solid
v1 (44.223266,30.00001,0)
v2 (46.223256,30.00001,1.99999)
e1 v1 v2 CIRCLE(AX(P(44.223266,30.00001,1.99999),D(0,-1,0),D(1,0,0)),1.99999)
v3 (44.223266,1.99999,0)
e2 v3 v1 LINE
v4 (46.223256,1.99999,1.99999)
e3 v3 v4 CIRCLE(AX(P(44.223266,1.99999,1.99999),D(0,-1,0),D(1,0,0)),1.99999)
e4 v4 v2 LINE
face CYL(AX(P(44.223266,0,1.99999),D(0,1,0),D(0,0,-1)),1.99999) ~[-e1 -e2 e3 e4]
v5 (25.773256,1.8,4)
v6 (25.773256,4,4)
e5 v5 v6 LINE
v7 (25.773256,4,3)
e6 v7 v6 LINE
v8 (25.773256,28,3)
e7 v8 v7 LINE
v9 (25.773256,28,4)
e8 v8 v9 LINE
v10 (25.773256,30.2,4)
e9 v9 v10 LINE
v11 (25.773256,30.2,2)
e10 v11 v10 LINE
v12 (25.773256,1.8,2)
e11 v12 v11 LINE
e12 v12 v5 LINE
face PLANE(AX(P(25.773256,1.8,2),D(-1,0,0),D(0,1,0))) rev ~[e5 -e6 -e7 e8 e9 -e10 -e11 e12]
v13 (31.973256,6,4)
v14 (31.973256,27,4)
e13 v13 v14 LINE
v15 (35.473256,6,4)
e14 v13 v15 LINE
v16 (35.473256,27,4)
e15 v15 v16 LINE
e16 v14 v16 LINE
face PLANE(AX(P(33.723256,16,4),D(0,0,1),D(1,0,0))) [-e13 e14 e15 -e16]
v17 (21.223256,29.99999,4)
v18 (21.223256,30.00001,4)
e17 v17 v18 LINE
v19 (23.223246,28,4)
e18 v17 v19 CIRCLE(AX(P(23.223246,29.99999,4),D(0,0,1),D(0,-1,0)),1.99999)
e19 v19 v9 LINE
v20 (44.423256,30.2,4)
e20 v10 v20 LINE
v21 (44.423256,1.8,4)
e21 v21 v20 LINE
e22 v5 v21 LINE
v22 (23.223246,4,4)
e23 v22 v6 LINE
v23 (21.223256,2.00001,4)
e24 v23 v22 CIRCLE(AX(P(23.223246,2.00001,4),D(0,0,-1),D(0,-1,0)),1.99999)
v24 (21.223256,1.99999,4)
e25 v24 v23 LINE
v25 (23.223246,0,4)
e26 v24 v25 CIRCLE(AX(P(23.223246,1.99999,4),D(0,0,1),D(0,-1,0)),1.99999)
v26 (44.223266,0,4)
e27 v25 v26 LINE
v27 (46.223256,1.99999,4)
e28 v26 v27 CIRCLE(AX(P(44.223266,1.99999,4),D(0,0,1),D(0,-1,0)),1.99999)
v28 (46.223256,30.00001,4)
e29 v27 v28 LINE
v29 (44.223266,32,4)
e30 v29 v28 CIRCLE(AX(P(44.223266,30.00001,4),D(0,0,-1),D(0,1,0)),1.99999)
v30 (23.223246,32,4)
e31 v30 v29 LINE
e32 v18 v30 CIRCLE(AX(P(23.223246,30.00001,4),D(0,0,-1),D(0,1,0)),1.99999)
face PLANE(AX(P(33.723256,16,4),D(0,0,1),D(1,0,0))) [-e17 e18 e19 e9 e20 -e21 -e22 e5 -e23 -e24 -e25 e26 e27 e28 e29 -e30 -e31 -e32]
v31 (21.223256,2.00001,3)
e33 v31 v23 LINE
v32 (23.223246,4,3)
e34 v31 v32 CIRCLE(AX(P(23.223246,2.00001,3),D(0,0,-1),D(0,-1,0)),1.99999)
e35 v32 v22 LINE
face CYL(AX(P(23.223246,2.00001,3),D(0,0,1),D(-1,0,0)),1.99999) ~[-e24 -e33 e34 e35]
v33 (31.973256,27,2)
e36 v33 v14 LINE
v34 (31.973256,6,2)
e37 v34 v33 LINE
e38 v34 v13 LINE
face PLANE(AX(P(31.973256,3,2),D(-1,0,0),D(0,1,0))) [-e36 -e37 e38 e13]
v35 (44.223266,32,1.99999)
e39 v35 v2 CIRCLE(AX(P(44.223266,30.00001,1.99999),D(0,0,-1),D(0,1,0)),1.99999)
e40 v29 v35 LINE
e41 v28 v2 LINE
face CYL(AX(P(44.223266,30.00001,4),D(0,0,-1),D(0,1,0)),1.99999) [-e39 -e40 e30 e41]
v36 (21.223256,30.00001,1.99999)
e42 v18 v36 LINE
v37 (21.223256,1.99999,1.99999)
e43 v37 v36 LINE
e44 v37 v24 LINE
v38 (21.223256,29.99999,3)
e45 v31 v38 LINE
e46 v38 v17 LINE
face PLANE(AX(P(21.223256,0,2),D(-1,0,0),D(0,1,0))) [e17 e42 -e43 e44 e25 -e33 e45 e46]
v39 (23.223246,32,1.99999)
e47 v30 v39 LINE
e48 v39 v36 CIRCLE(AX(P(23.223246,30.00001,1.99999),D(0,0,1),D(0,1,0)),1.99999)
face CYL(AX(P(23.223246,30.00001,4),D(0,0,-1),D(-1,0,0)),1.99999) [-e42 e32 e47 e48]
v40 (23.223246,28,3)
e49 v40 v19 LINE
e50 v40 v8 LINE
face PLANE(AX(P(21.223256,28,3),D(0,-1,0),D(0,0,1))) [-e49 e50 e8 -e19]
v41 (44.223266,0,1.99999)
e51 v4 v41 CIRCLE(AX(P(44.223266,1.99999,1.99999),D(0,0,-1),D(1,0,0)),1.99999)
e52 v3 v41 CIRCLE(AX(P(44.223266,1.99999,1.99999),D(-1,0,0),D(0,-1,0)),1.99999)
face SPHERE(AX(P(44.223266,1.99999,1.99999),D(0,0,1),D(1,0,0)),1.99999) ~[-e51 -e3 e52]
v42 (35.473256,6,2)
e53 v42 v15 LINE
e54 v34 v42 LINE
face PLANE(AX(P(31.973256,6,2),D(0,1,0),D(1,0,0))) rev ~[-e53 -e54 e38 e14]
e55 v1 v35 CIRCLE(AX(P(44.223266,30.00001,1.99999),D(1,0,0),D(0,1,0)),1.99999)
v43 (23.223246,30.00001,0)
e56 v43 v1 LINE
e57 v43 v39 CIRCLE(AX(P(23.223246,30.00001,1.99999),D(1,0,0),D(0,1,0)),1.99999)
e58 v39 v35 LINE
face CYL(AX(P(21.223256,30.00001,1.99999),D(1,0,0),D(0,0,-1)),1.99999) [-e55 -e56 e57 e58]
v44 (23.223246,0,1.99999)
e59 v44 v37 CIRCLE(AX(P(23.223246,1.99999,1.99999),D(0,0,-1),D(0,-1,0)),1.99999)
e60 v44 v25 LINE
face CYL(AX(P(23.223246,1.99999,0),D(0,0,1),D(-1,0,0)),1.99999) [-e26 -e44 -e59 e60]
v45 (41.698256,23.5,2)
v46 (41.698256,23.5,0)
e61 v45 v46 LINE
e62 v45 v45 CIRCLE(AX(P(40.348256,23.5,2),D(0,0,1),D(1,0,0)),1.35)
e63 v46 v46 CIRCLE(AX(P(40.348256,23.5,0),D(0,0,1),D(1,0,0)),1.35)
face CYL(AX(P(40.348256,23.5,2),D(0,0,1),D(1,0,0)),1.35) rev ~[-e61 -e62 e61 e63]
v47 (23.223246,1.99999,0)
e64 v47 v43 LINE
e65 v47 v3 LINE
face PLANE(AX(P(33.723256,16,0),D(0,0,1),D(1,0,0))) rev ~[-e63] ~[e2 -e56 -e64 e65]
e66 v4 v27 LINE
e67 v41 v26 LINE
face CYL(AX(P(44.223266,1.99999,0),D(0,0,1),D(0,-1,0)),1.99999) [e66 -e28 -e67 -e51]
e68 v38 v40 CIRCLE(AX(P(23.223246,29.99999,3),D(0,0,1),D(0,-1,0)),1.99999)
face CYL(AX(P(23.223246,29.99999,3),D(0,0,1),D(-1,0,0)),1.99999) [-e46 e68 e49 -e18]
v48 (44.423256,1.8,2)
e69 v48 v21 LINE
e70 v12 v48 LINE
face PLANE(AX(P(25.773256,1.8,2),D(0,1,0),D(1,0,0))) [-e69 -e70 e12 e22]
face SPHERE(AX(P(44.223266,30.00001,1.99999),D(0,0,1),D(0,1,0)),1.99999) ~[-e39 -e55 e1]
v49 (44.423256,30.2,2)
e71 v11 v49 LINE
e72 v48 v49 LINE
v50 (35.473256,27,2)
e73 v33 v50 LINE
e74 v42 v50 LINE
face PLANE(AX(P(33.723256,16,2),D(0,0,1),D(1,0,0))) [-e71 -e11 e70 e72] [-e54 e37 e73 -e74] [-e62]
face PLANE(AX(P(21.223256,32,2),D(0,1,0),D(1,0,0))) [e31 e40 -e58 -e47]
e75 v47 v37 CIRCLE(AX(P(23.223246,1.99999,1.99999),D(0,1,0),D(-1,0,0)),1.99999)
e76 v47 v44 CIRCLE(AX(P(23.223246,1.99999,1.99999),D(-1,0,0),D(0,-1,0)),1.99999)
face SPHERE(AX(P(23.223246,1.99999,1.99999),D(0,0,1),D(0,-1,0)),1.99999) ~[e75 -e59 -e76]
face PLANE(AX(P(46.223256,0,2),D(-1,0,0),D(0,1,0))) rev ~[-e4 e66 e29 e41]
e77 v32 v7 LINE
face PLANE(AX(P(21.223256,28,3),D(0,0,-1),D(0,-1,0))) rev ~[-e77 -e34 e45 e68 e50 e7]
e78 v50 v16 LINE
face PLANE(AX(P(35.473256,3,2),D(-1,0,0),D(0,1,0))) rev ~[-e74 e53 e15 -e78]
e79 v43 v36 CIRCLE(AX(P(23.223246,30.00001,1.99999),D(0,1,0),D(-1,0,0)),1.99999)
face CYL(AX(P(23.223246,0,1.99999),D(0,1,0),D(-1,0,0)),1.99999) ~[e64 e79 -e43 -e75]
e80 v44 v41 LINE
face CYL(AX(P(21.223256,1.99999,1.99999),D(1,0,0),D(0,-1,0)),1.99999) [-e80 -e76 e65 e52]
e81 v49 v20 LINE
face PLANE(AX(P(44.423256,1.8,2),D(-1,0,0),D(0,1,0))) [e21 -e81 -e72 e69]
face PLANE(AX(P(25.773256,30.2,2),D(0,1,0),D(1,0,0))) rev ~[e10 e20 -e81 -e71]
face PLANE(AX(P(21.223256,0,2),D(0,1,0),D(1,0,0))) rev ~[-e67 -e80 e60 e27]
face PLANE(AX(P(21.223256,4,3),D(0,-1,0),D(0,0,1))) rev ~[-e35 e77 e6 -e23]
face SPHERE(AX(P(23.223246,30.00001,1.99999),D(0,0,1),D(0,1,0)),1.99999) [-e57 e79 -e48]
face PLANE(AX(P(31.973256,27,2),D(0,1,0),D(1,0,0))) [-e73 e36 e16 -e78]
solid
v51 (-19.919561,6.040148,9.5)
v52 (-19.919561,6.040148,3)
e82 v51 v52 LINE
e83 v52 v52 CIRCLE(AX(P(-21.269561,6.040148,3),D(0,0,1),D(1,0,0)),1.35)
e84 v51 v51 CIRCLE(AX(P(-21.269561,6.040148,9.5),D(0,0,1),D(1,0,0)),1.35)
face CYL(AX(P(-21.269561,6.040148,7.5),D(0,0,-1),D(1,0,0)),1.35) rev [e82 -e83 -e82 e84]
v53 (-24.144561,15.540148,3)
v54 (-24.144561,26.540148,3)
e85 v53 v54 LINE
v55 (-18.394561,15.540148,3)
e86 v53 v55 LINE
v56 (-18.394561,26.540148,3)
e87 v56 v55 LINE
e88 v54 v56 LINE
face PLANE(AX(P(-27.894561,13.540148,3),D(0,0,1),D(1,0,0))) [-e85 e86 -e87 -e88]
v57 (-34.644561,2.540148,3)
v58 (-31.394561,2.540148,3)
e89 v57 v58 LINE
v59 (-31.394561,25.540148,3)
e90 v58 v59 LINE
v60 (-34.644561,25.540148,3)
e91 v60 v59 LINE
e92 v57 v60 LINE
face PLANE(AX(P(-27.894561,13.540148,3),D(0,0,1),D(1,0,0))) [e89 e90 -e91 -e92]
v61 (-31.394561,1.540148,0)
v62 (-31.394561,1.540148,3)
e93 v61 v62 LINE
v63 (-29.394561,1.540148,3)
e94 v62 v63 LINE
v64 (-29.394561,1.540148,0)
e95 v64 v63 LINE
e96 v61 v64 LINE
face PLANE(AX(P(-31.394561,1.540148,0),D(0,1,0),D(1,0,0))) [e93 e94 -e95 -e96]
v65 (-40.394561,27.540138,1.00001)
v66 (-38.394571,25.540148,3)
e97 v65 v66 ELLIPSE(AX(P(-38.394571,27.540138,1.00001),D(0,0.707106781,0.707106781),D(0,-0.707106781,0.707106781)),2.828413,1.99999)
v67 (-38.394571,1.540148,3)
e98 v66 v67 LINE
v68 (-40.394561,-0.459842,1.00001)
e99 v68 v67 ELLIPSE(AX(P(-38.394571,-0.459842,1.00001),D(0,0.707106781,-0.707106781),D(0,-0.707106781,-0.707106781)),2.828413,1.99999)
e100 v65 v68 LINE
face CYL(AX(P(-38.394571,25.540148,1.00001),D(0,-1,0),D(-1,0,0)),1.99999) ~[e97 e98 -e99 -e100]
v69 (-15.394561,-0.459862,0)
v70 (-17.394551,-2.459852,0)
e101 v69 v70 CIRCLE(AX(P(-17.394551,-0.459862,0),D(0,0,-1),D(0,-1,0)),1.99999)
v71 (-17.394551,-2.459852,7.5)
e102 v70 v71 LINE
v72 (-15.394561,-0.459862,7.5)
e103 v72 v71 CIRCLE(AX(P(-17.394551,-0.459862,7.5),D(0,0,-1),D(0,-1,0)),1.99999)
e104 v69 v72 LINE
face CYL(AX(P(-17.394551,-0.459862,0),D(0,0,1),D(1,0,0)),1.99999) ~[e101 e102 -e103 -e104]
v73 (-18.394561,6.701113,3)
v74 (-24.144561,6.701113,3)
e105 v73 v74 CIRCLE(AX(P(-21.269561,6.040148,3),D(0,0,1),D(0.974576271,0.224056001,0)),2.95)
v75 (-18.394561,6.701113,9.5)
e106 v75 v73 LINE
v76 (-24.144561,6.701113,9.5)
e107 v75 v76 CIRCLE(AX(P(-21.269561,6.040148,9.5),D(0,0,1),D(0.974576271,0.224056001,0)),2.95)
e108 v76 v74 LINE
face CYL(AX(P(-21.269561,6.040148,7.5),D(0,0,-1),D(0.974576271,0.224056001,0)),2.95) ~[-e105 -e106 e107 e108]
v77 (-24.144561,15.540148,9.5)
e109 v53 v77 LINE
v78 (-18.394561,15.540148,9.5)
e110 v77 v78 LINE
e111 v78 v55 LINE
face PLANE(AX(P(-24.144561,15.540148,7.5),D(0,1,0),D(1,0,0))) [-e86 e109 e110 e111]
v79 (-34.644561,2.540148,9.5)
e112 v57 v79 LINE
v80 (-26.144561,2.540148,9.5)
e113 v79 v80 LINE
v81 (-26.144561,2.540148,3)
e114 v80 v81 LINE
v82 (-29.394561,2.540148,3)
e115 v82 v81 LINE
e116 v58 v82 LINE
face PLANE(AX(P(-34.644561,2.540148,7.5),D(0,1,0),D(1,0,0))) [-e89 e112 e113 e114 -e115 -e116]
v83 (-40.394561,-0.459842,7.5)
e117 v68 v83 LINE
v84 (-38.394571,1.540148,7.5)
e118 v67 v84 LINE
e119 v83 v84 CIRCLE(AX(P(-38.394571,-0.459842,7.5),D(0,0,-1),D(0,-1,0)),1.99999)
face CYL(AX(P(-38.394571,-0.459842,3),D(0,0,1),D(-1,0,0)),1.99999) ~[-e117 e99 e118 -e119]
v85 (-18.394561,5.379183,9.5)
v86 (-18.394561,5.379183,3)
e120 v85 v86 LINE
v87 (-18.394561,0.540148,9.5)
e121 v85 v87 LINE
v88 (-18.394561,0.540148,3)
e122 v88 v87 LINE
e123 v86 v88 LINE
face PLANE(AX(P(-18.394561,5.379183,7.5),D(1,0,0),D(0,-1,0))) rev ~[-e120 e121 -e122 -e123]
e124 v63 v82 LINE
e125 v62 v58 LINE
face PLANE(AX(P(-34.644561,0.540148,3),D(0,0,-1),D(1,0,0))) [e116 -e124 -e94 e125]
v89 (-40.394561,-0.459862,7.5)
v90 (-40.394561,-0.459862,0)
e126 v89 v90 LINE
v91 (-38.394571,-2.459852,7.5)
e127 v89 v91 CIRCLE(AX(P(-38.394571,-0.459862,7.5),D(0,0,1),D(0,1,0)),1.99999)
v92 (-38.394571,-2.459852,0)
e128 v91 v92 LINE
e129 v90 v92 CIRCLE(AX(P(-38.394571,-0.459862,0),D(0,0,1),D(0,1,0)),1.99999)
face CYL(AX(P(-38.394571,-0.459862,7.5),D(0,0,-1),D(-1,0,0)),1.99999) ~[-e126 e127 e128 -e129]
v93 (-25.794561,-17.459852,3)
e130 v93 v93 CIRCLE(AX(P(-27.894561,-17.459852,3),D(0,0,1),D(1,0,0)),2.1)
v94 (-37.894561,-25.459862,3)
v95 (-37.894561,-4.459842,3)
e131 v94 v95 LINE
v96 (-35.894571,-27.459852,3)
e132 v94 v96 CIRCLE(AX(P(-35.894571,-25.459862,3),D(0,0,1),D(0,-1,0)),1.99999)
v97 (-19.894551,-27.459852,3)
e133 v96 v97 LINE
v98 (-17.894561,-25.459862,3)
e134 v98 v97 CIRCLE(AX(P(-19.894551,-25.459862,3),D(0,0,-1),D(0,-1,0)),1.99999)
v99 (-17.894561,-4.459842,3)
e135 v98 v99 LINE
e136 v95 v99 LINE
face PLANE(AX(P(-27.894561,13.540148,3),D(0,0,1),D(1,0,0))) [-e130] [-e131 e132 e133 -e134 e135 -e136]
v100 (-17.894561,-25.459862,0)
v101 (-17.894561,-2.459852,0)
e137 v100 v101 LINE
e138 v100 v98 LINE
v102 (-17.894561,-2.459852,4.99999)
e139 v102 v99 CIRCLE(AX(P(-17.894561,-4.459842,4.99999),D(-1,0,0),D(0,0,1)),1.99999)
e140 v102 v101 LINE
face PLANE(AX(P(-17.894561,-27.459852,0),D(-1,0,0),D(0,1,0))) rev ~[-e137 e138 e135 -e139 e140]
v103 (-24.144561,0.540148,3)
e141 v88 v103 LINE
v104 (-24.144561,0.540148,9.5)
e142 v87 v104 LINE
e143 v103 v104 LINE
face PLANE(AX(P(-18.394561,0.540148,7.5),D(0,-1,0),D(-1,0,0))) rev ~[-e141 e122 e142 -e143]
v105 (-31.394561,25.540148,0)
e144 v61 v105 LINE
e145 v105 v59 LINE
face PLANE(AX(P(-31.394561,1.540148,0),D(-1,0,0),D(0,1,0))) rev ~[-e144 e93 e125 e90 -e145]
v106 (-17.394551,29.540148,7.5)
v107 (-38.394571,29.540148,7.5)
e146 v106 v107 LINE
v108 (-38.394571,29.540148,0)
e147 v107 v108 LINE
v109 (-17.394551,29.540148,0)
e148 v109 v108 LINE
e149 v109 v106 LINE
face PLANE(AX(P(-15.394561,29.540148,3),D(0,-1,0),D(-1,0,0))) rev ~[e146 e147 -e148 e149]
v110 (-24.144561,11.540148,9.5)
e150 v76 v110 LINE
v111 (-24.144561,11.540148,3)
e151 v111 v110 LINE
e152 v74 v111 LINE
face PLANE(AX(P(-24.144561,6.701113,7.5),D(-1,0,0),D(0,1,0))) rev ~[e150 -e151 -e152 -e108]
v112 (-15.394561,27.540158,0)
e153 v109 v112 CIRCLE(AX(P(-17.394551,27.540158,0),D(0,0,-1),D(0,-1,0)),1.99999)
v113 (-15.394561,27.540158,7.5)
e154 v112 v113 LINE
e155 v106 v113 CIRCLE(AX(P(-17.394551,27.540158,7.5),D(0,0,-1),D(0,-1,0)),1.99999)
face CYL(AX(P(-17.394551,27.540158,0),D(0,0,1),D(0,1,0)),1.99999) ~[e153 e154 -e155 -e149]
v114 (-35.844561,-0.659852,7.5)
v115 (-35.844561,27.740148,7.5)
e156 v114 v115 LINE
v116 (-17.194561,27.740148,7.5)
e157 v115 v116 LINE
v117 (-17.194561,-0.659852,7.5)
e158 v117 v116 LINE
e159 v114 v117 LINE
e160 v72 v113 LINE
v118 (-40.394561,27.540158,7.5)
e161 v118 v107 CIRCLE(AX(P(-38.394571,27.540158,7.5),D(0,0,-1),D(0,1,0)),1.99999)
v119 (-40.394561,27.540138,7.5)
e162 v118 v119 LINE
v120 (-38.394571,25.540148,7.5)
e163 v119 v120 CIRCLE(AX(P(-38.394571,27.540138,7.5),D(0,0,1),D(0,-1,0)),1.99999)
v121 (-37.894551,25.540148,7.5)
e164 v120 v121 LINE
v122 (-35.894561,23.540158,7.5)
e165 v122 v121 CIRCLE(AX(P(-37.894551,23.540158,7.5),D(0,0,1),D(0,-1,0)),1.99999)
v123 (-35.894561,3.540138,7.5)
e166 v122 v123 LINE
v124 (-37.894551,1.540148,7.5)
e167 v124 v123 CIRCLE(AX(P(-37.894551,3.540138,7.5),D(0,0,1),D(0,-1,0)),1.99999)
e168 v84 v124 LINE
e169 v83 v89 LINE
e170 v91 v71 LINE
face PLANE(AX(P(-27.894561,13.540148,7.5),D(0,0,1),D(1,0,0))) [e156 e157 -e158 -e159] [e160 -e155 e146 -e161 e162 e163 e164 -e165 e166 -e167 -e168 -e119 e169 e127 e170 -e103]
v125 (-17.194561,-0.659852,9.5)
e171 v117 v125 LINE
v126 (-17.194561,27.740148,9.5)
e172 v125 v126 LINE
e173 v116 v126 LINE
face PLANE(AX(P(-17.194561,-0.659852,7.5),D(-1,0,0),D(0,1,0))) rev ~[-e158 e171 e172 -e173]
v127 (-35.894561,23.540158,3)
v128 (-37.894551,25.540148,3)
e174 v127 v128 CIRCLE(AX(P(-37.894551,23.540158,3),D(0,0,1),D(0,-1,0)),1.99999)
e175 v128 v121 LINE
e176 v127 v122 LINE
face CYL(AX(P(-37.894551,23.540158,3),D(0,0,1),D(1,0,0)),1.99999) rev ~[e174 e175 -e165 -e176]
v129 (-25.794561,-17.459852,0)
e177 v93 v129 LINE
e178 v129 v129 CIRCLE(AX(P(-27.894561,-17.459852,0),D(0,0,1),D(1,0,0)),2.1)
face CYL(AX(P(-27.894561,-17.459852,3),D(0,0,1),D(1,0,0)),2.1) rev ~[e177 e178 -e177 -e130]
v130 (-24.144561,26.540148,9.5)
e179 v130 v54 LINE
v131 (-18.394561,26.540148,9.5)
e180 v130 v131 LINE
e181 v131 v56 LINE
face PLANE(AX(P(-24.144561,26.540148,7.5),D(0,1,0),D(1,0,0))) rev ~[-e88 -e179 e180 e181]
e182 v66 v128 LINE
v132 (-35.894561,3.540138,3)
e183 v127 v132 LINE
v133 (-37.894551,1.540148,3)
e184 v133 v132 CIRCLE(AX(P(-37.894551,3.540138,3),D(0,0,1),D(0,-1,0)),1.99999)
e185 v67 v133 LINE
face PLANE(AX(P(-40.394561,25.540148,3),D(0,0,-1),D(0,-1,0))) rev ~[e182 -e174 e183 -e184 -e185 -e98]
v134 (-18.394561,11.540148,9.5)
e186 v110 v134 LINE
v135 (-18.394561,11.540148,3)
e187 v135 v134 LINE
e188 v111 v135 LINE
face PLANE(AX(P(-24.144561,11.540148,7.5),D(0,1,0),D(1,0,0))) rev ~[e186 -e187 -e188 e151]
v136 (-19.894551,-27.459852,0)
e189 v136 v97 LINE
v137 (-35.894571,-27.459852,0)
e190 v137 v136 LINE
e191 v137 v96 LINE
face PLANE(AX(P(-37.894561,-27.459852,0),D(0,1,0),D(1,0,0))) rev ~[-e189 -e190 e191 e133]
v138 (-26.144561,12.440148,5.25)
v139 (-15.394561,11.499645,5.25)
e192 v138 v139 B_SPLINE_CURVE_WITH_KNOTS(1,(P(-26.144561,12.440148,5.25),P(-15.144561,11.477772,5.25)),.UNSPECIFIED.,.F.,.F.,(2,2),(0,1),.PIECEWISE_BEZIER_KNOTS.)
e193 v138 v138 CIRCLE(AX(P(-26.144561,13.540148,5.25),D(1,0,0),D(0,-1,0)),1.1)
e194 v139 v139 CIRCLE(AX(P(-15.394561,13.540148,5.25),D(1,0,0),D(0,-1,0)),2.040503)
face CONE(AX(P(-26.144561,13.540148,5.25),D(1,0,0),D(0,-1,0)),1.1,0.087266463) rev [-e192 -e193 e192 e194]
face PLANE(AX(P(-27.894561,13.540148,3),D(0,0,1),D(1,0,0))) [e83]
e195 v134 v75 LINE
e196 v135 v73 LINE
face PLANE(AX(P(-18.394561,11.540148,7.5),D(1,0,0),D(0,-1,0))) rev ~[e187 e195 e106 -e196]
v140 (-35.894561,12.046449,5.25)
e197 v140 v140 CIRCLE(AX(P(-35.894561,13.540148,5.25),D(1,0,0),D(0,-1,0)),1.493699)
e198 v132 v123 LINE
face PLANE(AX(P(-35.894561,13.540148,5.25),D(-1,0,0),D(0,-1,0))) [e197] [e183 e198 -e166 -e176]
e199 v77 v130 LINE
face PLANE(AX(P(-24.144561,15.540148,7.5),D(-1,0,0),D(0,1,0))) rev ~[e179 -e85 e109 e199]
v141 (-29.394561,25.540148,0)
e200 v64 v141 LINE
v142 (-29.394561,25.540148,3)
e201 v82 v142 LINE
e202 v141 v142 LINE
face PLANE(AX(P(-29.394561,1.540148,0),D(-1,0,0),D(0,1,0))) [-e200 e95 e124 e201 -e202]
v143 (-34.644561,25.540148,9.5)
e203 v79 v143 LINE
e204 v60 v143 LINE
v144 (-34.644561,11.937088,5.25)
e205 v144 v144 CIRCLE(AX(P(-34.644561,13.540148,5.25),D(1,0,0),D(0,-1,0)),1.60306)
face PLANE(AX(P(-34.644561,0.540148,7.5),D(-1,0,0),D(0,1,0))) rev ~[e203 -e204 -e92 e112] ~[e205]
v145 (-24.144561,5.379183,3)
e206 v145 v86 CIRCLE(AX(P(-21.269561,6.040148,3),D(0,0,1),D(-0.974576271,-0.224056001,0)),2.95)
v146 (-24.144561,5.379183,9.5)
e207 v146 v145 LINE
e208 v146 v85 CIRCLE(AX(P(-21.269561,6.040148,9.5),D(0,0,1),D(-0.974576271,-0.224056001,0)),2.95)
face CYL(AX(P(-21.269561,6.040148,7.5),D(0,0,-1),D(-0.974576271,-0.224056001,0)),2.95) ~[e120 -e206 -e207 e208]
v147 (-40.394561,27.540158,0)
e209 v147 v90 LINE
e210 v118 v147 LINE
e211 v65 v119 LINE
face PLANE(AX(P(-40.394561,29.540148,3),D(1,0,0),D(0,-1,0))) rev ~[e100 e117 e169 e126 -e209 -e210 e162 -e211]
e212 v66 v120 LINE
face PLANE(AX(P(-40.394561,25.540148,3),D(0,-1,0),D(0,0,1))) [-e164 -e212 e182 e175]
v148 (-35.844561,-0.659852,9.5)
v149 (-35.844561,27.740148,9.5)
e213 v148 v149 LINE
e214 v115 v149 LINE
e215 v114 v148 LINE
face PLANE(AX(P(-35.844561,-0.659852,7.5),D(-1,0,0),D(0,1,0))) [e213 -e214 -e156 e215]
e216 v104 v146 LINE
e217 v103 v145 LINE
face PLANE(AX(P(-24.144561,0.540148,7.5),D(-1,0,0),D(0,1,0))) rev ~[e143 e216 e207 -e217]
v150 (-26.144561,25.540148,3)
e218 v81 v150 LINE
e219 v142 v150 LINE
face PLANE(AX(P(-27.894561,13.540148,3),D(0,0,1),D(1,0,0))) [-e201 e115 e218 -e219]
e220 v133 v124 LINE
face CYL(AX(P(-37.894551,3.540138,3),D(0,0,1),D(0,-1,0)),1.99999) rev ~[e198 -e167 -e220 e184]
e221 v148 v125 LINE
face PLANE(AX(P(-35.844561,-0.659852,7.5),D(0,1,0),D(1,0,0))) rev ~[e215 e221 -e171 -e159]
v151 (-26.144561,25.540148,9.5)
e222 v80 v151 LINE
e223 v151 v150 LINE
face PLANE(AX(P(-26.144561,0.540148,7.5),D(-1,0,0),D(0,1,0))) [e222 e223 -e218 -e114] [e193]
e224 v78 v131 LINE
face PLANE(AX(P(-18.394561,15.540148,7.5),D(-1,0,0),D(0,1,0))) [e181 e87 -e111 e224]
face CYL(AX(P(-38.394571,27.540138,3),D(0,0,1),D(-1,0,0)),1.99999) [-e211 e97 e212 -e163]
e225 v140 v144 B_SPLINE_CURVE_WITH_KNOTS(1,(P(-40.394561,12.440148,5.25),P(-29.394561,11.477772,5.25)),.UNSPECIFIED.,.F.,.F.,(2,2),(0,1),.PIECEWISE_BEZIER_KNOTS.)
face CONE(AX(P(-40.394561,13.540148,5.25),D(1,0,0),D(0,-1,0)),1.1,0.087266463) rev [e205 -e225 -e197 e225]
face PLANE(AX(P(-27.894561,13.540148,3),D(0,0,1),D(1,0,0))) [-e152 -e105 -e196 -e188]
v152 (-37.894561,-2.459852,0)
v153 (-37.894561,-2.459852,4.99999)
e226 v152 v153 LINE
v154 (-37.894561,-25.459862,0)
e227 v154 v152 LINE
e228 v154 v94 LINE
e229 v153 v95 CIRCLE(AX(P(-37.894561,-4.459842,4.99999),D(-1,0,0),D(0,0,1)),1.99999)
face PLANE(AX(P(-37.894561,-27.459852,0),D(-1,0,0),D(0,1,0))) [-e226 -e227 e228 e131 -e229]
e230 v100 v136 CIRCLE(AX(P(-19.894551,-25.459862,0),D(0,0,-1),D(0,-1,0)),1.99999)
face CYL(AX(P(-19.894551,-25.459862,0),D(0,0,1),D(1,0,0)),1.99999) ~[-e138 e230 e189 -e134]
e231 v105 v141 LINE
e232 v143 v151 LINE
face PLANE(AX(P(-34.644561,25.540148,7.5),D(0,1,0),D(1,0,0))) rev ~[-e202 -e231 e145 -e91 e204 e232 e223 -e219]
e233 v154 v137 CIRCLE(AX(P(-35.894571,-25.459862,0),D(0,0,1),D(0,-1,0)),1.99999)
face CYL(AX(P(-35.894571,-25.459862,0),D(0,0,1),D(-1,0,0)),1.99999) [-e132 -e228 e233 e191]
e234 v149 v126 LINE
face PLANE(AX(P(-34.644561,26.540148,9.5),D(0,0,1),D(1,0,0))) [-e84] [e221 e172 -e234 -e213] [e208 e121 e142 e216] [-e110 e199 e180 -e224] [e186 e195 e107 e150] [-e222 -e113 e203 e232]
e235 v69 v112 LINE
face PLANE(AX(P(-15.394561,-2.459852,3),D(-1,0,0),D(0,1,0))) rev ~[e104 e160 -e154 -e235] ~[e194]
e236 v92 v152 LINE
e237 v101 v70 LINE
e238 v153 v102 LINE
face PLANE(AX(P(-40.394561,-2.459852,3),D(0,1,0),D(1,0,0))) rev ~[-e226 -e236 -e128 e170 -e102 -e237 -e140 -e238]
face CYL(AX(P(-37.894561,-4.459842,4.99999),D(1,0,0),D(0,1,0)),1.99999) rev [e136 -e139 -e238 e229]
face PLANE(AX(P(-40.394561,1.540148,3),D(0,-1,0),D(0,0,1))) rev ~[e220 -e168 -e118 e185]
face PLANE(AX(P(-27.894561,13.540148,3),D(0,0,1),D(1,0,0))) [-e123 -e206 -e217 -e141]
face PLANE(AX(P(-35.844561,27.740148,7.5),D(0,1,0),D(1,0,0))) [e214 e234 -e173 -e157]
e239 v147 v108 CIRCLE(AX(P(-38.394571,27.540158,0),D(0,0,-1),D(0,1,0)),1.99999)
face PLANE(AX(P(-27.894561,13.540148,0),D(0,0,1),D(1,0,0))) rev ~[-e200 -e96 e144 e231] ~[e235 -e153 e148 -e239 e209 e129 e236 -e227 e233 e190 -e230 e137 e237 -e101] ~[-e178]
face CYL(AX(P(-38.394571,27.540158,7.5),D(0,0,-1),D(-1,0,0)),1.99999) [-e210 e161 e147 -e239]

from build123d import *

# Parameters (mm, degrees)
F0_W      = 2
F0_H      = 24
F0_W_2    = 20
F0_H_2    = 25
F1_DEPTH  = 3
F2_W      = 8.5
F2_H      = 26
F2_R      = 1.35
F2_W_2    = 5.75
F2_H_2    = 4
F3_DEPTH  = 4.5
F2_R_2    = 2.1
F4_DEPTH  = 25
F5_W      = 18.65
F5_H      = 28.4
F5_R      = 1.35
F5_W_2    = 8.5
F5_H_2    = 26
F5_W_3    = 5.75
F5_H_3    = 11
F6_DEPTH  = 2
F8_R      = 1.1
F7_R      = 1.1
F9_DEPTH  = 11
F9_TAPER  = -5
F8_W      = 24
F8_H      = 4.5
F10_DEPTH = 4.5
F11_W     = 25
F11_H     = 32
F12_DEPTH = 2
F13_W     = 25
F13_H     = 32
F13_W_2   = 18.65
F13_H_2   = 28.4
F14_DEPTH = 2
F15_W     = 3.5
F15_H     = 26
F16_DEPTH = 2
F15_R     = 1.35
F17_DEPTH = 25
F18_W     = 24
F18_H     = 1
F19_DEPTH = 4.6
F20_R     = 1.99999
F20_2_R   = 1.99999
F21_DEPTH = 2
F22_DEPTH = 1
F23_DEPTH = 3
F24_DEPTH = 2


# Not quite as in the source:
# - a fillet or chamfer is up to 0.001 mm smaller than in the source, because OpenCascade refuses the exact size
# - a feature names something its author has since deleted; it is built from what else it names


with BuildPart() as f1:
    # F0 (on Top) → F1 (new body)
    with BuildSketch(Plane.XY):
        Polygon((-15.3945611045, 29.5401477255), (-40.3945611045, 29.5401477255), (-40.3945611045, -2.4598522745), (-37.8945611045, -2.4598522745), (-17.8945611045, -2.4598522745), (-15.3945611045, -2.4598522745), align=None)
        with Locations((-30.3945611045, 13.5401477255)):
            Rectangle(F0_W, F0_H, mode=Mode.SUBTRACT)
        with Locations((-27.8945611045, -14.9598522745)):
            Rectangle(F0_W_2, F0_H_2)
    extrude(amount=F1_DEPTH)

    # F2 (on face) → F3 (join)
    with BuildSketch(Plane.XY.offset(3)):
        Polygon((-40.3945611045, -2.4598522745), (-37.8945611045, -2.4598522745), (-17.8945611045, -2.4598522745), (-15.3945611045, -2.4598522745), (-15.3945611045, 29.5401477255), (-40.3945611045, 29.5401477255), align=None)
        with Locations((-30.3945611045, 13.5401477255)):
            Rectangle(F2_W, F2_H, mode=Mode.SUBTRACT)
        with BuildLine():
            Line((-18.3945611045, 0.5401477255), (-24.1445611045, 0.5401477255))
            Line((-24.1445611045, 0.5401477255), (-24.1445611045, 5.3791825222))
            ThreePointArc((-24.1445611045, 5.3791825222), (-21.2695611045, 3.0901477255), (-18.3945611045, 5.3791825222))
            Line((-18.3945611045, 5.3791825222), (-18.3945611045, 0.5401477255))
        make_face(mode=Mode.SUBTRACT)
        with Locations((-21.2695611045, 6.0401477255)):
            Circle(F2_R, mode=Mode.SUBTRACT)
        with BuildLine():
            Line((-24.1445611045, 26.5401477255), (-18.3945611045, 26.5401477255))
            Line((-18.3945611045, 26.5401477255), (-18.3945611045, 15.5401477255))
            Line((-18.3945611045, 15.5401477255), (-18.3945611045, 11.5401477255))
            Line((-18.3945611045, 11.5401477255), (-18.3945611045, 6.7011129288))
            ThreePointArc((-18.3945611045, 6.7011129288), (-21.2695611045, 8.9901477255), (-24.1445611045, 6.7011129288))
            Line((-24.1445611045, 6.7011129288), (-24.1445611045, 11.5401477255))
            Line((-24.1445611045, 11.5401477255), (-24.1445611045, 15.5401477255))
            Line((-24.1445611045, 15.5401477255), (-24.1445611045, 26.5401477255))
        make_face(mode=Mode.SUBTRACT)
        with Locations((-21.2695611045, 13.5401477255)):
            Rectangle(F2_W_2, F2_H_2)
    extrude(amount=F3_DEPTH)

    # F2 (on face) → F4 (cut)
    with BuildSketch(Plane.XY.offset(3)):
        with Locations((-27.8945611045, -17.4598522745)):
            Circle(F2_R_2)
    extrude(amount=-F4_DEPTH, mode=Mode.SUBTRACT)

    # F5 (on face) → F6 (join)
    with BuildSketch(Plane.XY.offset(7.5)):
        with Locations((-26.5195611045, 13.5401477255)):
            Rectangle(F5_W, F5_H)
        with BuildLine():
            Line((-18.3945611045, 0.5401477255), (-24.1445611045, 0.5401477255))
            Line((-24.1445611045, 0.5401477255), (-24.1445611045, 5.3791825222))
            ThreePointArc((-24.1445611045, 5.3791825222), (-21.2695611045, 3.0901477255), (-18.3945611045, 5.3791825222))
            Line((-18.3945611045, 5.3791825222), (-18.3945611045, 0.5401477255))
        make_face(mode=Mode.SUBTRACT)
        with Locations((-21.2695611045, 6.0401477255)):
            Circle(F5_R, mode=Mode.SUBTRACT)
        with BuildLine():
            Line((-24.1445611045, 11.5401477255), (-18.3945611045, 11.5401477255))
            Line((-18.3945611045, 11.5401477255), (-18.3945611045, 6.7011129288))
            ThreePointArc((-18.3945611045, 6.7011129288), (-21.2695611045, 8.9901477255), (-24.1445611045, 6.7011129288))
            Line((-24.1445611045, 6.7011129288), (-24.1445611045, 11.5401477255))
        make_face(mode=Mode.SUBTRACT)
        with Locations((-30.3945611045, 13.5401477255)):
            Rectangle(F5_W_2, F5_H_2, mode=Mode.SUBTRACT)
        with Locations((-21.2695611045, 21.0401477255)):
            Rectangle(F5_W_3, F5_H_3, mode=Mode.SUBTRACT)
    extrude(amount=F6_DEPTH)

    # F8 (on face) + F7 (on face) → F9 (cut)
    with BuildSketch(Plane(origin=(-40.3945611045, 0, 0), x_dir=(0, -1, 0), z_dir=(-1, 0, 0))):
        with Locations((-13.5401477255, 5.25)):
            Circle(F8_R)
    with BuildSketch(Plane(origin=(-26.1445611045, 0, 0), x_dir=(0, -1, 0), z_dir=(-1, 0, 0))):
        with Locations((-13.5401477255, 5.25)):
            Circle(F7_R)
    extrude(amount=-F9_DEPTH, taper=F9_TAPER, mode=Mode.SUBTRACT)

    # F8 (on face) → F10 (cut)
    with BuildSketch(Plane(origin=(-40.3945611045, 0, 0), x_dir=(0, -1, 0), z_dir=(-1, 0, 0))):
        with Locations((-13.5401477255, 5.25)):
            Rectangle(F8_W, F8_H)
        with Locations((-13.5401477255, 5.25)):
            Circle(F8_R, mode=Mode.SUBTRACT)
    extrude(amount=-F10_DEPTH, mode=Mode.SUBTRACT)

    # F20 (radius 2 in the source; OpenCascade refuses exactly that, so slightly less here)
    f20_edges = [f1.edges().sort_by_distance(p)[0] for p in [
        (-40.394561, 29.540148, 3.75),
        (-40.394561, -2.459852, 3.75),
        (-40.394561, 13.540148, 3),
        (-40.394561, 1.540148, 5.25),
        (-15.394561, 29.540148, 3.75),
        (-15.394561, -2.459852, 3.75),
        (-27.894561, -2.459852, 3),
        (-17.894561, -27.459852, 1.5),
        (-37.894561, -27.459852, 1.5),
        (-40.394561, 25.540148, 5.25),
        (-35.894561, 1.540148, 5.25),
        (-35.894561, 25.540148, 5.25),
    ]]
    fillet(f20_edges, radius=F20_R)

    # F21 (add): a face of the model
    f21_faces = [f1.faces().sort_by_distance(p)[0] for p in [
        (-30.3945611045, 0.5401477255, 6.25),
    ]]
    extrude(f21_faces, amount=F21_DEPTH)

    # F22 (add): a face of the model
    f22_faces = [f1.faces().sort_by_distance(p)[0] for p in [
        (-30.3945611045, 26.5401477255, 6.25),
    ]]
    extrude(f22_faces, amount=F22_DEPTH)


with BuildPart() as f12:
    # F11 (on Top) → F12 (new body)
    with BuildSketch(Plane.XY):
        with Locations((33.7232563645, 16)):
            Rectangle(F11_W, F11_H)
    extrude(amount=F12_DEPTH)

    # F13 (on face) → F14 (join)
    with BuildSketch(Plane.XY.offset(2)):
        with Locations((33.7232563645, 16)):
            Rectangle(F13_W, F13_H)
        with Locations((35.0982563645, 16)):
            Rectangle(F13_W_2, F13_H_2, mode=Mode.SUBTRACT)
    extrude(amount=F14_DEPTH)

    # F15 (on face) → F16 (join)
    with BuildSketch(Plane.XY.offset(2)):
        with Locations((33.7232563645, 16)):
            Rectangle(F15_W, F15_H)
    extrude(amount=F16_DEPTH)

    # F15 (on face) → F17 (cut)
    with BuildSketch(Plane.XY.offset(2)):
        with Locations((40.3482563645, 23.5)):
            Circle(F15_R)
    extrude(amount=-F17_DEPTH, mode=Mode.SUBTRACT)

    # F18 (on face) → F19 (cut)
    with BuildSketch(Plane(origin=(21.2232563645, 0, 0), x_dir=(0, -1, 0), z_dir=(-1, 0, 0))):
        with Locations((-16, 3.5)):
            Rectangle(F18_W, F18_H)
    extrude(amount=-F19_DEPTH, mode=Mode.SUBTRACT)

    # F20#2 (radius 2 in the source; OpenCascade refuses exactly that, so slightly less here)
    f20_2_edges = [f12.edges().sort_by_distance(p)[0] for p in [
        (21.223256, 0, 2),
        (21.223256, 32, 2),
        (21.223256, 28, 3.5),
        (21.223256, 4, 3.5),
        (46.223256, 0, 2),
        (46.223256, 32, 2),
        (33.723256, 32, 0),
        (46.223256, 16, 0),
        (33.723256, 0, 0),
        (21.223256, 16, 0),
    ]]
    fillet(f20_2_edges, radius=F20_2_R)

    # F23 (cut): a face of the model
    f23_faces = [f12.faces().sort_by_distance(p)[0] for p in [
        (33.7232563645, 3, 3),
    ]]
    extrude(f23_faces, amount=-F23_DEPTH, mode=Mode.SUBTRACT)

    # F24 (cut): a face of the model
    f24_faces = [f12.faces().sort_by_distance(p)[0] for p in [
        (33.7232563645, 29, 3),
    ]]
    extrude(f24_faces, amount=-F24_DEPTH, mode=Mode.SUBTRACT)


solid = Compound([f1.part, f12.part])
